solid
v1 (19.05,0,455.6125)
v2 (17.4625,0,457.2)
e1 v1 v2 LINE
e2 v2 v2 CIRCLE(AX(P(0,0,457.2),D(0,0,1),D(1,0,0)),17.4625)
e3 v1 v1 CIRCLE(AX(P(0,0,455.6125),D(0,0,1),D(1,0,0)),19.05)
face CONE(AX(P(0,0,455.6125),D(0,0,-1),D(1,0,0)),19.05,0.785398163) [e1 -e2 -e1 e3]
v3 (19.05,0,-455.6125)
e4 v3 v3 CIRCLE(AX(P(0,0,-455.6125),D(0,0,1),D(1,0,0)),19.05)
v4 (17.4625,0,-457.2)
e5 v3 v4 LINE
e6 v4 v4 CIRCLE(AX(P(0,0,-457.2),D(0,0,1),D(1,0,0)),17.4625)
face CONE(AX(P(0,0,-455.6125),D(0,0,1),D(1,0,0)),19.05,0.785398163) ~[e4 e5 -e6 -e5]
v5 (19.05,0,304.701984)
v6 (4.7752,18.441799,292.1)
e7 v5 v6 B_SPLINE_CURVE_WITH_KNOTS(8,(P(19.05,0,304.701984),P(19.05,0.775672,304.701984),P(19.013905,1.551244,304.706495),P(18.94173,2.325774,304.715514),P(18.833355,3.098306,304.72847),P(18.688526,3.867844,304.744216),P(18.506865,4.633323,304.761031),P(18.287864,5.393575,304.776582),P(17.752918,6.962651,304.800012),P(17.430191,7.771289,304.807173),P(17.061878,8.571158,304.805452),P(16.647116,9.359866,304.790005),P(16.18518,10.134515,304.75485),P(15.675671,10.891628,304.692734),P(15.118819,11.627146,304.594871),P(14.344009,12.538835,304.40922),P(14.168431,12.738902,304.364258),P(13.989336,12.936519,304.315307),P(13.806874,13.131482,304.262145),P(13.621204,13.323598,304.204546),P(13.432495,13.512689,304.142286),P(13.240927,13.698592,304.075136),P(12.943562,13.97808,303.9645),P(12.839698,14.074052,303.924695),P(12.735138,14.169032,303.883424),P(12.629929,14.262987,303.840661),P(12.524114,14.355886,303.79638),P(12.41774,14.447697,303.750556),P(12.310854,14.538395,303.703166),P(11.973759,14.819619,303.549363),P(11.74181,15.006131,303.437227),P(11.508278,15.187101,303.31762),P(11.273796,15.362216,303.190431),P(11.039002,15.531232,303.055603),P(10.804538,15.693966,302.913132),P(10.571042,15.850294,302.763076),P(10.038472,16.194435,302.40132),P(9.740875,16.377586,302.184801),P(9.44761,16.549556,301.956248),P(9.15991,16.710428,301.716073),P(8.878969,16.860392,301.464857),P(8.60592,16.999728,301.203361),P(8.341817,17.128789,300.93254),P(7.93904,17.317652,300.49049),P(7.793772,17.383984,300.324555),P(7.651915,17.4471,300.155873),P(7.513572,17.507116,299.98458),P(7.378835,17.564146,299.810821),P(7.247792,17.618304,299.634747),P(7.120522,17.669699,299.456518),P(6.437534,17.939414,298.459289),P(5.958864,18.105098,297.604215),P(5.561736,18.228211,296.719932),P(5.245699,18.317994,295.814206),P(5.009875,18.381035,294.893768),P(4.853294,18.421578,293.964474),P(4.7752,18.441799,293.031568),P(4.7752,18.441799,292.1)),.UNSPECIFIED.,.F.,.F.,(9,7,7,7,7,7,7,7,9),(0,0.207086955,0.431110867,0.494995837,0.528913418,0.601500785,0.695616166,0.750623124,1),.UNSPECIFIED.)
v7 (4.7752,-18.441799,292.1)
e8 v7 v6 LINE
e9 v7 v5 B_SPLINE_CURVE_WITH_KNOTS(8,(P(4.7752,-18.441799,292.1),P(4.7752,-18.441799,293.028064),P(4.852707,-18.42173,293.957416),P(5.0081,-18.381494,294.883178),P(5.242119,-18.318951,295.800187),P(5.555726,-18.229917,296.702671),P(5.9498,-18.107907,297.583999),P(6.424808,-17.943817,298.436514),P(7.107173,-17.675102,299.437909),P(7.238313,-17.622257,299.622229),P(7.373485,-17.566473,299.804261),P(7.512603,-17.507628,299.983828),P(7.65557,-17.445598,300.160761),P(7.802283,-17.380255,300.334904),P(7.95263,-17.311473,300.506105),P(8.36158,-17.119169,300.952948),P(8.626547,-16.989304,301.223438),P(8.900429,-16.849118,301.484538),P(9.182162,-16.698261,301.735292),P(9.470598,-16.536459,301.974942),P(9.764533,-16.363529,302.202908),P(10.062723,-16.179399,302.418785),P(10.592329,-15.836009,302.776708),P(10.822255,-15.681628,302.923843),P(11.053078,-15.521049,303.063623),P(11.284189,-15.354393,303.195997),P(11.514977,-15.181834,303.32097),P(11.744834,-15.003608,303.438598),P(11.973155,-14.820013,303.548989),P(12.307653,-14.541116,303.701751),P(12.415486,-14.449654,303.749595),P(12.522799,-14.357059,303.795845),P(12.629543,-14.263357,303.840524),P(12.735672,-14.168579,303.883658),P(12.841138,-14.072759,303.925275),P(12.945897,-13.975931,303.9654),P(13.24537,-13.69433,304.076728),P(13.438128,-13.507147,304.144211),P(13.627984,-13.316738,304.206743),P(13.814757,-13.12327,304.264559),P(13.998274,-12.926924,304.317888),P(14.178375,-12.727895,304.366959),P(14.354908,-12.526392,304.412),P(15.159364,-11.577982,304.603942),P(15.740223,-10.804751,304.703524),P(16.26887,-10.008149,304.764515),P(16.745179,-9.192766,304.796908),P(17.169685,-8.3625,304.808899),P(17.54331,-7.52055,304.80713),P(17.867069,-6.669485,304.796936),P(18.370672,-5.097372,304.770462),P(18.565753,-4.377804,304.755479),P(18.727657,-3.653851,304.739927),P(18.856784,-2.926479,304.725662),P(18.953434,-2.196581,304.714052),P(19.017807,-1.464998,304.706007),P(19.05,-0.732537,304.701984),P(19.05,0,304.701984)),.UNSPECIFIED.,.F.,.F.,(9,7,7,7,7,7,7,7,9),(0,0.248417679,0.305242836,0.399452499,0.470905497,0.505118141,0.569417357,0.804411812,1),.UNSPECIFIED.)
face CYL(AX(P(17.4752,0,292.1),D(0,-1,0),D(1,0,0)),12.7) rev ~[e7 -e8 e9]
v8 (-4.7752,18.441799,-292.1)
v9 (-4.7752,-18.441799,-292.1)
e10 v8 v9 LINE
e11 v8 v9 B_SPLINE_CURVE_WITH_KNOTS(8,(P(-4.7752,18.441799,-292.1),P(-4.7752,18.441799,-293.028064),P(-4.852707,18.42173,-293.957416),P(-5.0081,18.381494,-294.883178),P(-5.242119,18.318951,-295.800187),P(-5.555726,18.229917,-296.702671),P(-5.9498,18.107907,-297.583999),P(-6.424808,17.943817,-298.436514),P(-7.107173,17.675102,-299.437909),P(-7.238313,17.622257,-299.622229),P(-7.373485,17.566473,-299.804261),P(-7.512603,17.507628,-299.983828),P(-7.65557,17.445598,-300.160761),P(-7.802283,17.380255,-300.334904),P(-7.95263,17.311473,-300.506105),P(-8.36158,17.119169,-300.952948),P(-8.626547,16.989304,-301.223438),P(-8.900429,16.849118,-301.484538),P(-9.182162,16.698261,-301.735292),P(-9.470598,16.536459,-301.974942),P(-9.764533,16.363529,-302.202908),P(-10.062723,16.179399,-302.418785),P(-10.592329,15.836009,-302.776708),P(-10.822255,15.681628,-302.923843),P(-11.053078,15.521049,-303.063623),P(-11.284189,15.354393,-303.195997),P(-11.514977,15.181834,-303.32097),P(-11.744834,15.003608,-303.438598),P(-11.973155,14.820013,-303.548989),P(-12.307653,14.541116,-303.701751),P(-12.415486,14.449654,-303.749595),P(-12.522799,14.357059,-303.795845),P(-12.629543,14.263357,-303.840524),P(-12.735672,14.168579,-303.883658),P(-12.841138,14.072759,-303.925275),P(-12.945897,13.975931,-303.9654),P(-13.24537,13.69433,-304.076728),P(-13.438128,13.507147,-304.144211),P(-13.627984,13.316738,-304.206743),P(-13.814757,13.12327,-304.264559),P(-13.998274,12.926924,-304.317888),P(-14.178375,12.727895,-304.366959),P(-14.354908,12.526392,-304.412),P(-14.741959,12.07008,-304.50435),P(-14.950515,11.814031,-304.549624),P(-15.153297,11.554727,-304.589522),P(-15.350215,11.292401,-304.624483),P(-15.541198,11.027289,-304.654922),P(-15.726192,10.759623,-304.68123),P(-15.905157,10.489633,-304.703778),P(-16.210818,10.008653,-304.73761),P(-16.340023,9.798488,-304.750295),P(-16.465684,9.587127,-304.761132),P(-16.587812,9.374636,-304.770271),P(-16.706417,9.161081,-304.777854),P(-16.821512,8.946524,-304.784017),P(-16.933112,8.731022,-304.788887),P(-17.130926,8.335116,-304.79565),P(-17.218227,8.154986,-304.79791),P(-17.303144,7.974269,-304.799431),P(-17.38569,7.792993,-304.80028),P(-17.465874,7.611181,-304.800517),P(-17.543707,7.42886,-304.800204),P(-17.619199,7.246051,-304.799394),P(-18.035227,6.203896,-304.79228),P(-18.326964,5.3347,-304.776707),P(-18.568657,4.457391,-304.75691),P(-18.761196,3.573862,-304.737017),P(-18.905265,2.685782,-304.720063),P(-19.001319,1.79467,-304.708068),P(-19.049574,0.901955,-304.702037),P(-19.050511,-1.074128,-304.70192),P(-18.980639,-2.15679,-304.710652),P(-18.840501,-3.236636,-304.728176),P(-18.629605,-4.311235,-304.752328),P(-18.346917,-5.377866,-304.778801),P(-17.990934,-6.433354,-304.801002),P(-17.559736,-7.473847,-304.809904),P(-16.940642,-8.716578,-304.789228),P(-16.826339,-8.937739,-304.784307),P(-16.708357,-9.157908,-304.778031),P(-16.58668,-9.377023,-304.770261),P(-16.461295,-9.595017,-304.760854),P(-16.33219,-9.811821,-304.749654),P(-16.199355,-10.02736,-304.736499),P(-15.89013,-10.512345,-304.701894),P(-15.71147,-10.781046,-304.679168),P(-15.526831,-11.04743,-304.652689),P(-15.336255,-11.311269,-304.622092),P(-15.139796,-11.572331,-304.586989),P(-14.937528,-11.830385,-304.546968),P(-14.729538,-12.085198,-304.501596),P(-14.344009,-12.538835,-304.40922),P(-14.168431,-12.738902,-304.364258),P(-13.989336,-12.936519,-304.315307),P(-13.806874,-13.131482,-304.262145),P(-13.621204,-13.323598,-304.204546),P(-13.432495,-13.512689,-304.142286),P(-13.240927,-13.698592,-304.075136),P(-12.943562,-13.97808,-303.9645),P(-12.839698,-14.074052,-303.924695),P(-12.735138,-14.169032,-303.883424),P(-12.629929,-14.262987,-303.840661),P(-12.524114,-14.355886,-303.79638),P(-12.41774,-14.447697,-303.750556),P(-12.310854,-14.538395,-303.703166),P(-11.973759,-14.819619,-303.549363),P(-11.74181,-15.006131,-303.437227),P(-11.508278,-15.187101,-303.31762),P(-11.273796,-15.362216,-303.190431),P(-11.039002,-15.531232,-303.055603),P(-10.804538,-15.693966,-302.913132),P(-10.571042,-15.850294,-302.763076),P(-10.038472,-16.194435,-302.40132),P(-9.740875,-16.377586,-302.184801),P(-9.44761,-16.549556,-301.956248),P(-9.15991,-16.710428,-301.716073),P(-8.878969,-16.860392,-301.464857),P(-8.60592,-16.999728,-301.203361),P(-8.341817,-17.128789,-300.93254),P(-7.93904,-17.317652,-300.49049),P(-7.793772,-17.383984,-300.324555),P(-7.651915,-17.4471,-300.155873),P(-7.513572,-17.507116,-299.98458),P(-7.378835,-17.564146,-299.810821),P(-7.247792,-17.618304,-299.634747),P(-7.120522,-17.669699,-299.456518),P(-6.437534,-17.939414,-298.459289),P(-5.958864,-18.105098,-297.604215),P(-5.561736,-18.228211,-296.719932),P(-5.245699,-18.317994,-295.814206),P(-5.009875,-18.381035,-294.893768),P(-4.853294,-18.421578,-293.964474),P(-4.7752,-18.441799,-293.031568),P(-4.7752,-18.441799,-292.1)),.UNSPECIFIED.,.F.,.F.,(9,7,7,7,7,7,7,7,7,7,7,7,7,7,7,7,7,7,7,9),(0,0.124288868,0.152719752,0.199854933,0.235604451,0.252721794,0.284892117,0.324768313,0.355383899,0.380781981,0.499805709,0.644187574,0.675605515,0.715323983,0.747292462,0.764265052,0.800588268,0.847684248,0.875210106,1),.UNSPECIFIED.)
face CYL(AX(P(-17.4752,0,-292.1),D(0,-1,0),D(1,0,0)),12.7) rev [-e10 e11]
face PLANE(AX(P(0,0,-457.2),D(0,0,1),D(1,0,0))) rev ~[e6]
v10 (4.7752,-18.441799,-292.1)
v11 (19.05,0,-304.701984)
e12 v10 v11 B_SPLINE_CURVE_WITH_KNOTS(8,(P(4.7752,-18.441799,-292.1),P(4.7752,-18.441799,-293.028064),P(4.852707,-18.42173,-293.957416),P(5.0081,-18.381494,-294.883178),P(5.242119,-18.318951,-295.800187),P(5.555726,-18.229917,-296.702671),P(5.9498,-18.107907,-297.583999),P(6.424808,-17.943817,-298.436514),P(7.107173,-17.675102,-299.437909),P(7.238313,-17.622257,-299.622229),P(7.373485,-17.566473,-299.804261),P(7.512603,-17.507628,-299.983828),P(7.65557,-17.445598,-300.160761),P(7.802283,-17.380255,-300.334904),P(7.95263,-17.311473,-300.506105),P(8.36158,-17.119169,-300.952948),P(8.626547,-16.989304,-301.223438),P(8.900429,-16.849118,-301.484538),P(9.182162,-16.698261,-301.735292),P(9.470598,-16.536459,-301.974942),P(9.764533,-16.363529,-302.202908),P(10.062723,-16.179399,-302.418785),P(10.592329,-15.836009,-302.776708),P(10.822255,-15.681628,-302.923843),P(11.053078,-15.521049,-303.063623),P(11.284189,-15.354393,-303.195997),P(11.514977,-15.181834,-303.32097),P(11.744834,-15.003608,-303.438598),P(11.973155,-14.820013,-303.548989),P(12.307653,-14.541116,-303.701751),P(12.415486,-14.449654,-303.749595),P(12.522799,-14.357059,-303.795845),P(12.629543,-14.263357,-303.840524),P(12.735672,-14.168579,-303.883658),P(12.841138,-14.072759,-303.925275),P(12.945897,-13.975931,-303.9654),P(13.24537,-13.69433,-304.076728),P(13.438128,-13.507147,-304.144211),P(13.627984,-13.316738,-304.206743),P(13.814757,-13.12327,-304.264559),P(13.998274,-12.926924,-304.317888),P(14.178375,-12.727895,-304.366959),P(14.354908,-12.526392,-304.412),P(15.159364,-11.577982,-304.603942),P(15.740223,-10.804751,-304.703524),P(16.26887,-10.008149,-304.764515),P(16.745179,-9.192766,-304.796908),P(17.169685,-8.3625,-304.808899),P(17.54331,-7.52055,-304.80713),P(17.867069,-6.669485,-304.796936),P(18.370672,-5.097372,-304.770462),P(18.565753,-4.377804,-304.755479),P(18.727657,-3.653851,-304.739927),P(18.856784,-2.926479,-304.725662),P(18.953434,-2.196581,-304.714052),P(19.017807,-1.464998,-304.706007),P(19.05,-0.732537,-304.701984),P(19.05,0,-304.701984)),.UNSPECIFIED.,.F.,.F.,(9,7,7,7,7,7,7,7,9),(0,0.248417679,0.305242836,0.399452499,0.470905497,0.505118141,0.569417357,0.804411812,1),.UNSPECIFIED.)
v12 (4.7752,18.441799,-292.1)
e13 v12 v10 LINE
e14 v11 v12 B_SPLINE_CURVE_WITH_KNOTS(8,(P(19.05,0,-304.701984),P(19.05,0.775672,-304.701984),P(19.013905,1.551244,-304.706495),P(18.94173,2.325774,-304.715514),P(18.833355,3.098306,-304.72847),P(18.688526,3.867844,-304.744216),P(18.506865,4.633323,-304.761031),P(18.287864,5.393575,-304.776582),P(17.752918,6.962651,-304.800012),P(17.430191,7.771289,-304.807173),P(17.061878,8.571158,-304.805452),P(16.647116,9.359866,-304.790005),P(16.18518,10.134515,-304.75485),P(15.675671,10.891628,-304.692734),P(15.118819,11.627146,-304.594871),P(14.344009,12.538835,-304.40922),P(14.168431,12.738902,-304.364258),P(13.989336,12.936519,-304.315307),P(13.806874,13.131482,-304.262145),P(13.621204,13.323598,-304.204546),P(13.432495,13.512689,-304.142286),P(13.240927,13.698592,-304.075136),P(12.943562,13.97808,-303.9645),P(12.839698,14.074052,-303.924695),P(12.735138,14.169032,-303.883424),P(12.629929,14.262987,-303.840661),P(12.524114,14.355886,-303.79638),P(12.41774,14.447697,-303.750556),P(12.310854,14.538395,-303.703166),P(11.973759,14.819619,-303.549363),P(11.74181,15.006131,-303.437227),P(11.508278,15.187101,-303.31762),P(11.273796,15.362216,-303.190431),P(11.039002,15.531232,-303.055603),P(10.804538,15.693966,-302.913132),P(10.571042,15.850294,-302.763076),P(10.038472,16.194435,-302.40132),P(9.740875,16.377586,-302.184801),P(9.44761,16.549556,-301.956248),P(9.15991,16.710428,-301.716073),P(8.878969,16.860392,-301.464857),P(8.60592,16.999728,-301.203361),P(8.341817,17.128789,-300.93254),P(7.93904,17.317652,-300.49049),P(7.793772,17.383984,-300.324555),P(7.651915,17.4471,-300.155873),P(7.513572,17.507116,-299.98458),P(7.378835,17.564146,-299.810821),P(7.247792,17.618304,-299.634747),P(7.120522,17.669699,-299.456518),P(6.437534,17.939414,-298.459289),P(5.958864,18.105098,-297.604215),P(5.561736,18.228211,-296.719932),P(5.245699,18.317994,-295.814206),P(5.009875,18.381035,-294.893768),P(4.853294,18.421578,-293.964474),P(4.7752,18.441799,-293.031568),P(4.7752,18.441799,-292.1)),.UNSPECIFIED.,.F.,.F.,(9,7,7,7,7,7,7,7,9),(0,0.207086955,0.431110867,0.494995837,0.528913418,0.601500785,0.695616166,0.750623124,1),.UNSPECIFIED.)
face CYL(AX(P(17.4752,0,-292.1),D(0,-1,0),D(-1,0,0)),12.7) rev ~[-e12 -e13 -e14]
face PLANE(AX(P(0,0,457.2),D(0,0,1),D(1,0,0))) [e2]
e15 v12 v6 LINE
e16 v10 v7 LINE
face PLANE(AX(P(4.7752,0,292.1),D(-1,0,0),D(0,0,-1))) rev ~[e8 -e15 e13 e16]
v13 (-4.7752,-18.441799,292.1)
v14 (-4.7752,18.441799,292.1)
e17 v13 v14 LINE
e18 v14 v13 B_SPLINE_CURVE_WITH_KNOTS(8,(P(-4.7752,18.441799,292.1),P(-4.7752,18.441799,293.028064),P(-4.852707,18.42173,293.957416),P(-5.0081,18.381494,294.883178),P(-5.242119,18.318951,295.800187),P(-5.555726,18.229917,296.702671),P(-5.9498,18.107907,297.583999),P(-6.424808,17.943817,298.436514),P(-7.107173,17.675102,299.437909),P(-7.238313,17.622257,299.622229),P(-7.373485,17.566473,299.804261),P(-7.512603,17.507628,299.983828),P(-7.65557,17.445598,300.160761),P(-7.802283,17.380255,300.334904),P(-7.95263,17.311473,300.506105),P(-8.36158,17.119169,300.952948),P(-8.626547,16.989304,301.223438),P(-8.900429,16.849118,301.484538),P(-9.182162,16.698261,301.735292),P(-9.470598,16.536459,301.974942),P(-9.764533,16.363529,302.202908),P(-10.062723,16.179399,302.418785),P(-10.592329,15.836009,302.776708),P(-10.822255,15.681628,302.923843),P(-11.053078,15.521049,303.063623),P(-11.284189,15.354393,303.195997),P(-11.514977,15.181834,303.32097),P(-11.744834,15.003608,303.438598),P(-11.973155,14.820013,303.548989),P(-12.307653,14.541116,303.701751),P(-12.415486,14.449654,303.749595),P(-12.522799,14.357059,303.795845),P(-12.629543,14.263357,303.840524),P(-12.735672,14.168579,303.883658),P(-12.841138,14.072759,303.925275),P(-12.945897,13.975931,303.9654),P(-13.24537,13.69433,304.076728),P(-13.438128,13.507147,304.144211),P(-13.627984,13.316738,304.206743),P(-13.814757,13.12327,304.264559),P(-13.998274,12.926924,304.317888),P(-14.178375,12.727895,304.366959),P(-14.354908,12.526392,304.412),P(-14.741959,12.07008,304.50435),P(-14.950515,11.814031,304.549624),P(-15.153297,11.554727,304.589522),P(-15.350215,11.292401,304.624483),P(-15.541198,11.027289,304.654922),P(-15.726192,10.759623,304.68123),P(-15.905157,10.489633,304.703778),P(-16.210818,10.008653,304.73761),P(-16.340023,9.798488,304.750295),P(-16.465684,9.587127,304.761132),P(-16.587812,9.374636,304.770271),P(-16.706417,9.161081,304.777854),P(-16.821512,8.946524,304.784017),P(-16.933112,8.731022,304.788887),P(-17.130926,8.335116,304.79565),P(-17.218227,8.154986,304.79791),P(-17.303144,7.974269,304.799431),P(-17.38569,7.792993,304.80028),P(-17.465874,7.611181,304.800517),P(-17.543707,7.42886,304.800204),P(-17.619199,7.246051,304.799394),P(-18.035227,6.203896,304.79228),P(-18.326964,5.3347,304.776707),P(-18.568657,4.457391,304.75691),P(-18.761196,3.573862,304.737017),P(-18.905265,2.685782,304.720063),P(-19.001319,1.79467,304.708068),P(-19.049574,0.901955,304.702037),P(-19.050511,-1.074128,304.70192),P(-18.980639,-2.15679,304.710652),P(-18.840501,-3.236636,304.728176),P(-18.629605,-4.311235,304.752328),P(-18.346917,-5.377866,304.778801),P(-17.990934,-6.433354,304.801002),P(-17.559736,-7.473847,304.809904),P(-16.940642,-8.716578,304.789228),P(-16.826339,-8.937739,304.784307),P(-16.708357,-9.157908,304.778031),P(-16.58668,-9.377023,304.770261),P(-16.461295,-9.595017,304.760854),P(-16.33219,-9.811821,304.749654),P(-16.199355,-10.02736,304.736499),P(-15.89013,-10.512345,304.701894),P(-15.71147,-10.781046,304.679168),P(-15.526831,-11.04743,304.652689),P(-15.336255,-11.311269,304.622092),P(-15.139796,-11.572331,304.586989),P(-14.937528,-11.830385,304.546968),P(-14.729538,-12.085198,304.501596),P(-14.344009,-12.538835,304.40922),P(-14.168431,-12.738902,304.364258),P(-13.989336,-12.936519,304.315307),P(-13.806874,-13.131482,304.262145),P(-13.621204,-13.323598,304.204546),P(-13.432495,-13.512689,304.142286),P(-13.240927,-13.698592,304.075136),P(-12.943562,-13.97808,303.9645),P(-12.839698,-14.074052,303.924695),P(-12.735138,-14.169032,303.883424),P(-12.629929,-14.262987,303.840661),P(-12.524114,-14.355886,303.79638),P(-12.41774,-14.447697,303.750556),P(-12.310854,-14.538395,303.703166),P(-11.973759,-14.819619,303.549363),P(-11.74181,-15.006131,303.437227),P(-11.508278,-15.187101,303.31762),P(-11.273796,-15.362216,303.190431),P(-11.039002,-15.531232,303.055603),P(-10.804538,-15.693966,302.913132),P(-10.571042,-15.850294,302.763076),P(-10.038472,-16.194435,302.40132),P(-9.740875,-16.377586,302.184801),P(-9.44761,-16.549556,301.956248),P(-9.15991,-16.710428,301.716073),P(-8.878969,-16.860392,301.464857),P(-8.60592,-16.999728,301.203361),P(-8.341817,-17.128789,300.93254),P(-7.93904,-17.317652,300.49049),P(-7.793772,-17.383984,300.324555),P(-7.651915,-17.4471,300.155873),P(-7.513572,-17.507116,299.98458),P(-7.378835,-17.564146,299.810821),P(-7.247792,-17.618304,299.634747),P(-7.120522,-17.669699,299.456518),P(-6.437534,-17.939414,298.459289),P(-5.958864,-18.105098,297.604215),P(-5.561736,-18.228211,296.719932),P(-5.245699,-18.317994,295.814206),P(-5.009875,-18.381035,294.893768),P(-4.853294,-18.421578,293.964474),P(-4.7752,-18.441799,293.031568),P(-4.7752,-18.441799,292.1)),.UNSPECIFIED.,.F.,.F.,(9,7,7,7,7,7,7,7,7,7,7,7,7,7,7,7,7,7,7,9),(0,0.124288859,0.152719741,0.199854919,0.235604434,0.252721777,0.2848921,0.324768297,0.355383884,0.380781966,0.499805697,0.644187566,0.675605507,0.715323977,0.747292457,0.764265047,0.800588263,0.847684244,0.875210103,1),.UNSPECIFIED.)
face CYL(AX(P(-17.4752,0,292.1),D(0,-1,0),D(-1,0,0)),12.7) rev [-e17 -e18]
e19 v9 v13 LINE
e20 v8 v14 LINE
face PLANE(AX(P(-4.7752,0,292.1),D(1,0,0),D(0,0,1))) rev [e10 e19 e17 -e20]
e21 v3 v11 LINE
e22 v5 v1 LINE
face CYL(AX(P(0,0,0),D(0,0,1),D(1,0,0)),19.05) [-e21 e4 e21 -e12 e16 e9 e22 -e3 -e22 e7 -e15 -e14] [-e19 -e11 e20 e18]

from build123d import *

# Parameters (mm, degrees)
F0_R     = 19.05
F1_DEPTH = 457.2
F2_SIZE2 = 1.5875
F2_SIZE  = 1.5875
F4_DEPTH = 19.05


# Not quite as in the source:
# - a pattern or mirror of a feature is missing from the dataset's text; its kind, count and spacing are read off the source's solid


with BuildPart() as f1:
    # F0 (on Top) → F1 (new body, symmetric)
    with BuildSketch(Plane.XY):
        Circle(F0_R)
    extrude(amount=F1_DEPTH, both=True)

    # F2
    f2_edges = [f1.edges().sort_by_distance(p)[0] for p in [
        (-19.05, 0, 457.2),
        (-19.05, 0, -457.2),
    ]]
    chamfer(f2_edges, length=F2_SIZE, length2=F2_SIZE2)

    # F3 (on Front) → F4 (cut, symmetric)
    with BuildSketch(Plane.XZ):
        with BuildLine():
            Line((4.7752, 292.1), (4.7752, -292.1))
            ThreePointArc((4.7752, -292.1), (17.4752, -304.8), (30.1752, -292.1))
            Line((30.1752, -292.1), (30.1752, 292.1))
            ThreePointArc((30.1752, 292.1), (17.4752, 304.8), (4.7752, 292.1))
        make_face()
    f4 = extrude(amount=F4_DEPTH, both=True, mode=Mode.SUBTRACT)

    # F4_copies: F4 across plane
    add(f4.mirror(Plane(origin=(0, 0, 0), x_dir=(0, 0, -1), z_dir=(-1, 0, 0))), mode=Mode.SUBTRACT)


solid = f1.part
